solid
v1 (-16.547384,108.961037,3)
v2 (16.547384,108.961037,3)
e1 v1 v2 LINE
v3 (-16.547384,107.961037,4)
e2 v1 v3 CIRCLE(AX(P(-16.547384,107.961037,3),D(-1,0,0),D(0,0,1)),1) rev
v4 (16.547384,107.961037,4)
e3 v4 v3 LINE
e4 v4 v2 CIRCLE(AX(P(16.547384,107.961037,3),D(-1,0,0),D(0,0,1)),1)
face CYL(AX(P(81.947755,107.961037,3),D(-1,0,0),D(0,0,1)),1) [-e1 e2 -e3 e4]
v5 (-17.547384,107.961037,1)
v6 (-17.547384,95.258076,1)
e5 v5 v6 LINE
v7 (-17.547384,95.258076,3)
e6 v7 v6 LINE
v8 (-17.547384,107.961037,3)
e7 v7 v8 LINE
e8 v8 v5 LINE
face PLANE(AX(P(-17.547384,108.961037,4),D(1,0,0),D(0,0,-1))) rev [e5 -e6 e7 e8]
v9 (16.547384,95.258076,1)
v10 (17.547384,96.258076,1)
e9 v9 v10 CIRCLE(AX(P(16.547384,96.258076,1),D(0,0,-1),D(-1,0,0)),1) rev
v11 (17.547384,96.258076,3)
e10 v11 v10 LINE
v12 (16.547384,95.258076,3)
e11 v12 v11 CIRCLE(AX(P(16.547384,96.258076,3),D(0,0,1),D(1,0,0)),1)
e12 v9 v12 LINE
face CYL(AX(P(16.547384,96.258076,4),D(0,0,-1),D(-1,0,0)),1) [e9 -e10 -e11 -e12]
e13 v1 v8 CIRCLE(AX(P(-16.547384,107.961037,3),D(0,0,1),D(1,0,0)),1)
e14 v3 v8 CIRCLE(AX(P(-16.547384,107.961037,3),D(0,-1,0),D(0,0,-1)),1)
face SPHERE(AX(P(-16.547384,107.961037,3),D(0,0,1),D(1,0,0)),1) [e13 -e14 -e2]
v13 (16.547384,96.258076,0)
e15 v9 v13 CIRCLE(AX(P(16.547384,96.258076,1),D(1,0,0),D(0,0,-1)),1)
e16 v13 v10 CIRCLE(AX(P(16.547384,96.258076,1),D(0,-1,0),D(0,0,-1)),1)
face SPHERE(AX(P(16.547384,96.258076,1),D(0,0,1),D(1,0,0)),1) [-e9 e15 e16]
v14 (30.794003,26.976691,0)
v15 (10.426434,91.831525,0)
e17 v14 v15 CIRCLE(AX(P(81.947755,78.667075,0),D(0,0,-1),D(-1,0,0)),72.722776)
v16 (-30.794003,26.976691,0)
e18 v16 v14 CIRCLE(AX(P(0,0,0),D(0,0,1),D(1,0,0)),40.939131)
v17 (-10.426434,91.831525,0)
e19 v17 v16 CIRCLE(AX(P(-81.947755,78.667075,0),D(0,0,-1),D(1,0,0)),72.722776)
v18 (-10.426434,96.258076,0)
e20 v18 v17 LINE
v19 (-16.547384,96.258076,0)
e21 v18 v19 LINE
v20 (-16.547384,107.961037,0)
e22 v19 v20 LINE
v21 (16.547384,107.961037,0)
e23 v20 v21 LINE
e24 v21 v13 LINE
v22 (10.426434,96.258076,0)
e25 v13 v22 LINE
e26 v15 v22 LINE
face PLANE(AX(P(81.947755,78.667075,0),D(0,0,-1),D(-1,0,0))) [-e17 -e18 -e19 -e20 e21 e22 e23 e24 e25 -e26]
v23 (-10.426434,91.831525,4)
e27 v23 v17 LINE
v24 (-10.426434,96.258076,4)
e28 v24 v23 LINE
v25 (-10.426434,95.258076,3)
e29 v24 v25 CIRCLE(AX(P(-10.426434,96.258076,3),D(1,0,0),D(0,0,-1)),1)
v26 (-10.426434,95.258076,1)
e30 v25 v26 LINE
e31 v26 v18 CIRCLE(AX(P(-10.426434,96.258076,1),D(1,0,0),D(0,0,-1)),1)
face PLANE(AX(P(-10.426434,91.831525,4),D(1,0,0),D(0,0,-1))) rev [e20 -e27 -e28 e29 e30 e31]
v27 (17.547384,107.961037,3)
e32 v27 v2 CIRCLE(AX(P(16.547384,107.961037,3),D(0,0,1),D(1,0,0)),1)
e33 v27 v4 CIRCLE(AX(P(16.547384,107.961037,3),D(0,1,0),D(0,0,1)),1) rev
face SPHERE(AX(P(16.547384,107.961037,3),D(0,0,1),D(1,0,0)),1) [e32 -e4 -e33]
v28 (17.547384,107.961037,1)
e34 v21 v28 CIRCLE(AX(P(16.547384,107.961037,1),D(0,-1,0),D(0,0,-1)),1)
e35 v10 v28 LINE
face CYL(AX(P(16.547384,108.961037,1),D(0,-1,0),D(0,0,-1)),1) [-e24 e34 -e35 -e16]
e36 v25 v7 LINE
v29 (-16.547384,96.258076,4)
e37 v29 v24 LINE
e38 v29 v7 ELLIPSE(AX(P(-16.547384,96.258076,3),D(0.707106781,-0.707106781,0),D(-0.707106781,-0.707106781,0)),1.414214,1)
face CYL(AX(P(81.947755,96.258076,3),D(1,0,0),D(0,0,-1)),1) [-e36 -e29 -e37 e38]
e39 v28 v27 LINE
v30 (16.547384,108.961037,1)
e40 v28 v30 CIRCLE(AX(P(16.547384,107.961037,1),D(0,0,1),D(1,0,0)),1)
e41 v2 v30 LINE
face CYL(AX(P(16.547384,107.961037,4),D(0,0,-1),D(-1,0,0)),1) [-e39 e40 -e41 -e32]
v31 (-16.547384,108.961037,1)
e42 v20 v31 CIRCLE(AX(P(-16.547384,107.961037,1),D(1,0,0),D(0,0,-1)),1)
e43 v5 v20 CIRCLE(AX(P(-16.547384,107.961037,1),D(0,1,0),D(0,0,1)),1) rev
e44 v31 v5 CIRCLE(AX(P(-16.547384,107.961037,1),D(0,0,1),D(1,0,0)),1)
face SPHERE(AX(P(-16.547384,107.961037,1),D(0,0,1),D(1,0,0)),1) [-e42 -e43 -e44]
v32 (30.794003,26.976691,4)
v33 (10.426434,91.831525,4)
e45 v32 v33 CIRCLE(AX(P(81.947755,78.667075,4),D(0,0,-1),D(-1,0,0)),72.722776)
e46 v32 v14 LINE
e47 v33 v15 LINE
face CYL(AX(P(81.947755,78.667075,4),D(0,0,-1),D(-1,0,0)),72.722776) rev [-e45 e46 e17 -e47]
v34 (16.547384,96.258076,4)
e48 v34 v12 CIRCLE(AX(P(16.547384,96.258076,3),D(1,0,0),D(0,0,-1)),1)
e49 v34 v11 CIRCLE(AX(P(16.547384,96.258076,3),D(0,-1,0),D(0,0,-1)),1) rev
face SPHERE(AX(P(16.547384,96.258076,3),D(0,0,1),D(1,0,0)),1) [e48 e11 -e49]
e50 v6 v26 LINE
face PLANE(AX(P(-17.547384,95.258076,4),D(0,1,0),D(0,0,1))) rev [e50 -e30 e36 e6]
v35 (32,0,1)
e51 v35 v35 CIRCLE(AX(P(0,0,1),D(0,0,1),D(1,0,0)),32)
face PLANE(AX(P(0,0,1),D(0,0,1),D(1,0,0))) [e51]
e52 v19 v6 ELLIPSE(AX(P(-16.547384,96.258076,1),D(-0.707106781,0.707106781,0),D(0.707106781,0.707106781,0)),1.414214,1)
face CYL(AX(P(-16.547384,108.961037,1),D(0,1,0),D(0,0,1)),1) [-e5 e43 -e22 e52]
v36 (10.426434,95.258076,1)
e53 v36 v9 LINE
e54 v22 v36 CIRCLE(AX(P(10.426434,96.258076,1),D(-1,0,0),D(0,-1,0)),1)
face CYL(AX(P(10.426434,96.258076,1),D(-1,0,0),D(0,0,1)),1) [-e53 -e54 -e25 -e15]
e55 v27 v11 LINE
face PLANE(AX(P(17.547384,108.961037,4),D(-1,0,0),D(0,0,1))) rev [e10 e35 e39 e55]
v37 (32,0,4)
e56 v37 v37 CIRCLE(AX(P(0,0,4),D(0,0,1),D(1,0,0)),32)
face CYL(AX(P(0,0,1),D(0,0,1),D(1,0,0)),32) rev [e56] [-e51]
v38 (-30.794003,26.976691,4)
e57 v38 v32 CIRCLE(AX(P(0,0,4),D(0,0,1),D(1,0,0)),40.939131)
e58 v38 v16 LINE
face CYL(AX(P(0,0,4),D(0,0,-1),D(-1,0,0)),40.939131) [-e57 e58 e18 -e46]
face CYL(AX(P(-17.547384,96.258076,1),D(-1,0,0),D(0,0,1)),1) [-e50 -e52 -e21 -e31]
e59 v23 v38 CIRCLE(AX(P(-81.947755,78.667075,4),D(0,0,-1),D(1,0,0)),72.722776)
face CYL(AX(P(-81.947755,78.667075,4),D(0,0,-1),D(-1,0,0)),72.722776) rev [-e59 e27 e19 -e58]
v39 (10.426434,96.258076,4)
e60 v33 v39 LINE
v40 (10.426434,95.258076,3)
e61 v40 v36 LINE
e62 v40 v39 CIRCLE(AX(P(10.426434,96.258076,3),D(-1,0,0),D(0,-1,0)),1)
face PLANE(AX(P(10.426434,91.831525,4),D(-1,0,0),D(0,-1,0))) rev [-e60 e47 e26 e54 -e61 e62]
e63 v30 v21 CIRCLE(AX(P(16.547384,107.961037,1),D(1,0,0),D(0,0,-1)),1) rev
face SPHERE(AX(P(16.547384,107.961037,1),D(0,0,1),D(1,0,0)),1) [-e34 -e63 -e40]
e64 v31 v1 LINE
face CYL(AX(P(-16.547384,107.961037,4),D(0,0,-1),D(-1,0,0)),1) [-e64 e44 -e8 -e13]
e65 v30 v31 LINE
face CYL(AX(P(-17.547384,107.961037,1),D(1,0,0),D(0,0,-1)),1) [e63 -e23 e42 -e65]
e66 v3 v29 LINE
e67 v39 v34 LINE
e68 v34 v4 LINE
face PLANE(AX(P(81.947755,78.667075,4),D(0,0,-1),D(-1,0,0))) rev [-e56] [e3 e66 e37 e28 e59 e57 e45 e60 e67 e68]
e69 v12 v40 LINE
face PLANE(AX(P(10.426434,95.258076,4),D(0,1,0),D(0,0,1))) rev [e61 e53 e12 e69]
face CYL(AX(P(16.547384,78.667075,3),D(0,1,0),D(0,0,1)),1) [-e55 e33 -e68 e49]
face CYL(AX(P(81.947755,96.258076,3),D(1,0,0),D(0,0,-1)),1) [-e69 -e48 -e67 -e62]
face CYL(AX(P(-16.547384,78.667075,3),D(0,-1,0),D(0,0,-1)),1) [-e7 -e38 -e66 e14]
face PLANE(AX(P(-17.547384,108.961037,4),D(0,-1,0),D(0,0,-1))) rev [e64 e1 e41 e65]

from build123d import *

# Parameters (mm, degrees)
EXTRUDE_2_DEPTH     = 4
SKETCH_5_R          = 32
CUT_EXTRUDE_2_DEPTH = 3
FILLET_7_R          = 1
FILLET_8_R          = 1


with BuildPart() as part:
    # 草图4 → 凸台-拉伸2 (new body)
    with BuildSketch(Plane.XY):
        with BuildLine():
            Line((10.426433706, 95.258075622), (17.547383854, 95.258075622))
            Line((17.547383854, 95.258075622), (17.547383854, 108.961036928))
            Line((17.547383854, 108.961036928), (-17.547383854, 108.961036928))
            Line((-17.547383854, 108.961036928), (-17.547383854, 95.258075622))
            Line((-17.547383854, 95.258075622), (-10.426433706, 95.258075622))
            Line((-10.426433706, 95.258075622), (-10.426433706, 91.831524795))
            ThreePointArc((-10.426433706, 91.831524795), (-12.565979517, 56.877826167), (-30.794002854, 26.976691251))
            ThreePointArc((-30.794002854, 26.976691251), (0, -40.939131434), (30.794002854, 26.976691251))
            ThreePointArc((30.794002854, 26.976691251), (12.565979517, 56.877826167), (10.426433706, 91.831524795))
            Line((10.426433706, 91.831524795), (10.426433706, 95.258075622))
        make_face()
    extrude(amount=EXTRUDE_2_DEPTH)

    # 草图5 → 切除-拉伸2 (cut)
    with BuildSketch(Plane.XY.offset(4)):
        Circle(SKETCH_5_R)
    extrude(amount=-CUT_EXTRUDE_2_DEPTH, mode=Mode.SUBTRACT)

    # 圆角7
    fillet_7_edges = [part.edges().sort_by_distance(p)[0] for p in [
        (-13.98690878, 95.258075622, 0),
        (-17.547383854, 102.109556275, 0),
        (0, 108.961036928, 0),
        (17.547383854, 102.109556275, 0),
        (13.98690878, 95.258075622, 4),
        (13.98690878, 95.258075622, 0),
        (17.547383854, 102.109556275, 4),
        (17.547383854, 95.258075622, 2),
        (0, 108.961036928, 4),
        (-17.547383854, 102.109556275, 4),
        (-13.98690878, 95.258075622, 4),
    ]]
    fillet(fillet_7_edges, radius=FILLET_7_R)

    # 圆角8
    # the kernel refuses this fillet: 1 mm, written as the material it takes off along each edge
    with BuildSketch(Plane(origin=(-16.547383854, 107.961036928, 1), x_dir=(0, 1, 0), z_dir=(-1, 0, 0))) as fillet_8_piece_1_section:
        Polygon((0, 0), (FILLET_8_R, 0), (FILLET_8_R, FILLET_8_R), (0, FILLET_8_R), align=None)
    fillet_8_piece_1 = extrude(amount=FILLET_8_R, mode=Mode.PRIVATE)
    fillet_8_piece_1 = fillet_8_piece_1 - Plane(origin=(-16.547383854, 107.961036928, 1), x_dir=(0, -0.7071067811865475, 0.7071067811865475), z_dir=(-1, 0, 0)) * Sphere(FILLET_8_R, mode=Mode.PRIVATE)
    add(fillet_8_piece_1, mode=Mode.SUBTRACT)
    with BuildSketch(Plane(origin=(16.547383854, 107.961036928, 1), x_dir=(0, 1, 0), z_dir=(1, 0, 0))) as fillet_8_piece_2_section:
        Polygon((0, 0), (FILLET_8_R, 0), (FILLET_8_R, -FILLET_8_R), (0, -FILLET_8_R), align=None)
    fillet_8_piece_2 = extrude(amount=FILLET_8_R, mode=Mode.PRIVATE)
    fillet_8_piece_2 = fillet_8_piece_2 - Plane(origin=(16.547383854, 107.961036928, 1), x_dir=(0, -0.7071067811865475, 0.7071067811865475), z_dir=(1, 0, 0)) * Sphere(FILLET_8_R, mode=Mode.PRIVATE)
    add(fillet_8_piece_2, mode=Mode.SUBTRACT)
    with BuildSketch(Plane(origin=(16.547383854, 107.961036928, 3), x_dir=(0, 1, 0), z_dir=(1, 0, 0))) as fillet_8_piece_3_section:
        Polygon((0, 0), (FILLET_8_R, 0), (FILLET_8_R, FILLET_8_R), (0, FILLET_8_R), align=None)
    fillet_8_piece_3 = extrude(amount=FILLET_8_R, mode=Mode.PRIVATE)
    fillet_8_piece_3 = fillet_8_piece_3 - Plane(origin=(16.547383854, 107.961036928, 3), x_dir=(0, -0.7071067811865475, -0.7071067811865475), z_dir=(1, 0, 0)) * Sphere(FILLET_8_R, mode=Mode.PRIVATE)
    add(fillet_8_piece_3, mode=Mode.SUBTRACT)
    with BuildSketch(Plane(origin=(-16.547383854, 107.961036928, 3), x_dir=(0, 1, 0), z_dir=(-1, 0, 0))) as fillet_8_piece_4_section:
        Polygon((0, 0), (FILLET_8_R, 0), (FILLET_8_R, -FILLET_8_R), (0, -FILLET_8_R), align=None)
    fillet_8_piece_4 = extrude(amount=FILLET_8_R, mode=Mode.PRIVATE)
    fillet_8_piece_4 = fillet_8_piece_4 - Plane(origin=(-16.547383854, 107.961036928, 3), x_dir=(0, -0.7071067811865475, -0.7071067811865475), z_dir=(-1, 0, 0)) * Sphere(FILLET_8_R, mode=Mode.PRIVATE)
    add(fillet_8_piece_4, mode=Mode.SUBTRACT)
    with BuildSketch(Plane(origin=(-17.547383854, 108.961036928, 1), x_dir=(0, -1, 0), z_dir=(0, 0, 1))) as fillet_8_piece_5:
        with BuildLine():
            CenterArc((FILLET_8_R, FILLET_8_R), FILLET_8_R, 180, 90)
            Line((0, FILLET_8_R), (0, 0))
            Line((0, 0), (FILLET_8_R, 0))
        make_face()
    extrude(amount=2, mode=Mode.SUBTRACT)
    with BuildSketch(Plane(origin=(17.547383854, 108.961036928, 1), x_dir=(0, -1, 0), z_dir=(0, 0, 1))) as fillet_8_piece_6:
        with BuildLine():
            CenterArc((FILLET_8_R, -FILLET_8_R), FILLET_8_R, 90, 90)
            Line((0, -FILLET_8_R), (0, 0))
            Line((0, 0), (FILLET_8_R, 0))
        make_face()
    extrude(amount=2, mode=Mode.SUBTRACT)


solid = part.part
